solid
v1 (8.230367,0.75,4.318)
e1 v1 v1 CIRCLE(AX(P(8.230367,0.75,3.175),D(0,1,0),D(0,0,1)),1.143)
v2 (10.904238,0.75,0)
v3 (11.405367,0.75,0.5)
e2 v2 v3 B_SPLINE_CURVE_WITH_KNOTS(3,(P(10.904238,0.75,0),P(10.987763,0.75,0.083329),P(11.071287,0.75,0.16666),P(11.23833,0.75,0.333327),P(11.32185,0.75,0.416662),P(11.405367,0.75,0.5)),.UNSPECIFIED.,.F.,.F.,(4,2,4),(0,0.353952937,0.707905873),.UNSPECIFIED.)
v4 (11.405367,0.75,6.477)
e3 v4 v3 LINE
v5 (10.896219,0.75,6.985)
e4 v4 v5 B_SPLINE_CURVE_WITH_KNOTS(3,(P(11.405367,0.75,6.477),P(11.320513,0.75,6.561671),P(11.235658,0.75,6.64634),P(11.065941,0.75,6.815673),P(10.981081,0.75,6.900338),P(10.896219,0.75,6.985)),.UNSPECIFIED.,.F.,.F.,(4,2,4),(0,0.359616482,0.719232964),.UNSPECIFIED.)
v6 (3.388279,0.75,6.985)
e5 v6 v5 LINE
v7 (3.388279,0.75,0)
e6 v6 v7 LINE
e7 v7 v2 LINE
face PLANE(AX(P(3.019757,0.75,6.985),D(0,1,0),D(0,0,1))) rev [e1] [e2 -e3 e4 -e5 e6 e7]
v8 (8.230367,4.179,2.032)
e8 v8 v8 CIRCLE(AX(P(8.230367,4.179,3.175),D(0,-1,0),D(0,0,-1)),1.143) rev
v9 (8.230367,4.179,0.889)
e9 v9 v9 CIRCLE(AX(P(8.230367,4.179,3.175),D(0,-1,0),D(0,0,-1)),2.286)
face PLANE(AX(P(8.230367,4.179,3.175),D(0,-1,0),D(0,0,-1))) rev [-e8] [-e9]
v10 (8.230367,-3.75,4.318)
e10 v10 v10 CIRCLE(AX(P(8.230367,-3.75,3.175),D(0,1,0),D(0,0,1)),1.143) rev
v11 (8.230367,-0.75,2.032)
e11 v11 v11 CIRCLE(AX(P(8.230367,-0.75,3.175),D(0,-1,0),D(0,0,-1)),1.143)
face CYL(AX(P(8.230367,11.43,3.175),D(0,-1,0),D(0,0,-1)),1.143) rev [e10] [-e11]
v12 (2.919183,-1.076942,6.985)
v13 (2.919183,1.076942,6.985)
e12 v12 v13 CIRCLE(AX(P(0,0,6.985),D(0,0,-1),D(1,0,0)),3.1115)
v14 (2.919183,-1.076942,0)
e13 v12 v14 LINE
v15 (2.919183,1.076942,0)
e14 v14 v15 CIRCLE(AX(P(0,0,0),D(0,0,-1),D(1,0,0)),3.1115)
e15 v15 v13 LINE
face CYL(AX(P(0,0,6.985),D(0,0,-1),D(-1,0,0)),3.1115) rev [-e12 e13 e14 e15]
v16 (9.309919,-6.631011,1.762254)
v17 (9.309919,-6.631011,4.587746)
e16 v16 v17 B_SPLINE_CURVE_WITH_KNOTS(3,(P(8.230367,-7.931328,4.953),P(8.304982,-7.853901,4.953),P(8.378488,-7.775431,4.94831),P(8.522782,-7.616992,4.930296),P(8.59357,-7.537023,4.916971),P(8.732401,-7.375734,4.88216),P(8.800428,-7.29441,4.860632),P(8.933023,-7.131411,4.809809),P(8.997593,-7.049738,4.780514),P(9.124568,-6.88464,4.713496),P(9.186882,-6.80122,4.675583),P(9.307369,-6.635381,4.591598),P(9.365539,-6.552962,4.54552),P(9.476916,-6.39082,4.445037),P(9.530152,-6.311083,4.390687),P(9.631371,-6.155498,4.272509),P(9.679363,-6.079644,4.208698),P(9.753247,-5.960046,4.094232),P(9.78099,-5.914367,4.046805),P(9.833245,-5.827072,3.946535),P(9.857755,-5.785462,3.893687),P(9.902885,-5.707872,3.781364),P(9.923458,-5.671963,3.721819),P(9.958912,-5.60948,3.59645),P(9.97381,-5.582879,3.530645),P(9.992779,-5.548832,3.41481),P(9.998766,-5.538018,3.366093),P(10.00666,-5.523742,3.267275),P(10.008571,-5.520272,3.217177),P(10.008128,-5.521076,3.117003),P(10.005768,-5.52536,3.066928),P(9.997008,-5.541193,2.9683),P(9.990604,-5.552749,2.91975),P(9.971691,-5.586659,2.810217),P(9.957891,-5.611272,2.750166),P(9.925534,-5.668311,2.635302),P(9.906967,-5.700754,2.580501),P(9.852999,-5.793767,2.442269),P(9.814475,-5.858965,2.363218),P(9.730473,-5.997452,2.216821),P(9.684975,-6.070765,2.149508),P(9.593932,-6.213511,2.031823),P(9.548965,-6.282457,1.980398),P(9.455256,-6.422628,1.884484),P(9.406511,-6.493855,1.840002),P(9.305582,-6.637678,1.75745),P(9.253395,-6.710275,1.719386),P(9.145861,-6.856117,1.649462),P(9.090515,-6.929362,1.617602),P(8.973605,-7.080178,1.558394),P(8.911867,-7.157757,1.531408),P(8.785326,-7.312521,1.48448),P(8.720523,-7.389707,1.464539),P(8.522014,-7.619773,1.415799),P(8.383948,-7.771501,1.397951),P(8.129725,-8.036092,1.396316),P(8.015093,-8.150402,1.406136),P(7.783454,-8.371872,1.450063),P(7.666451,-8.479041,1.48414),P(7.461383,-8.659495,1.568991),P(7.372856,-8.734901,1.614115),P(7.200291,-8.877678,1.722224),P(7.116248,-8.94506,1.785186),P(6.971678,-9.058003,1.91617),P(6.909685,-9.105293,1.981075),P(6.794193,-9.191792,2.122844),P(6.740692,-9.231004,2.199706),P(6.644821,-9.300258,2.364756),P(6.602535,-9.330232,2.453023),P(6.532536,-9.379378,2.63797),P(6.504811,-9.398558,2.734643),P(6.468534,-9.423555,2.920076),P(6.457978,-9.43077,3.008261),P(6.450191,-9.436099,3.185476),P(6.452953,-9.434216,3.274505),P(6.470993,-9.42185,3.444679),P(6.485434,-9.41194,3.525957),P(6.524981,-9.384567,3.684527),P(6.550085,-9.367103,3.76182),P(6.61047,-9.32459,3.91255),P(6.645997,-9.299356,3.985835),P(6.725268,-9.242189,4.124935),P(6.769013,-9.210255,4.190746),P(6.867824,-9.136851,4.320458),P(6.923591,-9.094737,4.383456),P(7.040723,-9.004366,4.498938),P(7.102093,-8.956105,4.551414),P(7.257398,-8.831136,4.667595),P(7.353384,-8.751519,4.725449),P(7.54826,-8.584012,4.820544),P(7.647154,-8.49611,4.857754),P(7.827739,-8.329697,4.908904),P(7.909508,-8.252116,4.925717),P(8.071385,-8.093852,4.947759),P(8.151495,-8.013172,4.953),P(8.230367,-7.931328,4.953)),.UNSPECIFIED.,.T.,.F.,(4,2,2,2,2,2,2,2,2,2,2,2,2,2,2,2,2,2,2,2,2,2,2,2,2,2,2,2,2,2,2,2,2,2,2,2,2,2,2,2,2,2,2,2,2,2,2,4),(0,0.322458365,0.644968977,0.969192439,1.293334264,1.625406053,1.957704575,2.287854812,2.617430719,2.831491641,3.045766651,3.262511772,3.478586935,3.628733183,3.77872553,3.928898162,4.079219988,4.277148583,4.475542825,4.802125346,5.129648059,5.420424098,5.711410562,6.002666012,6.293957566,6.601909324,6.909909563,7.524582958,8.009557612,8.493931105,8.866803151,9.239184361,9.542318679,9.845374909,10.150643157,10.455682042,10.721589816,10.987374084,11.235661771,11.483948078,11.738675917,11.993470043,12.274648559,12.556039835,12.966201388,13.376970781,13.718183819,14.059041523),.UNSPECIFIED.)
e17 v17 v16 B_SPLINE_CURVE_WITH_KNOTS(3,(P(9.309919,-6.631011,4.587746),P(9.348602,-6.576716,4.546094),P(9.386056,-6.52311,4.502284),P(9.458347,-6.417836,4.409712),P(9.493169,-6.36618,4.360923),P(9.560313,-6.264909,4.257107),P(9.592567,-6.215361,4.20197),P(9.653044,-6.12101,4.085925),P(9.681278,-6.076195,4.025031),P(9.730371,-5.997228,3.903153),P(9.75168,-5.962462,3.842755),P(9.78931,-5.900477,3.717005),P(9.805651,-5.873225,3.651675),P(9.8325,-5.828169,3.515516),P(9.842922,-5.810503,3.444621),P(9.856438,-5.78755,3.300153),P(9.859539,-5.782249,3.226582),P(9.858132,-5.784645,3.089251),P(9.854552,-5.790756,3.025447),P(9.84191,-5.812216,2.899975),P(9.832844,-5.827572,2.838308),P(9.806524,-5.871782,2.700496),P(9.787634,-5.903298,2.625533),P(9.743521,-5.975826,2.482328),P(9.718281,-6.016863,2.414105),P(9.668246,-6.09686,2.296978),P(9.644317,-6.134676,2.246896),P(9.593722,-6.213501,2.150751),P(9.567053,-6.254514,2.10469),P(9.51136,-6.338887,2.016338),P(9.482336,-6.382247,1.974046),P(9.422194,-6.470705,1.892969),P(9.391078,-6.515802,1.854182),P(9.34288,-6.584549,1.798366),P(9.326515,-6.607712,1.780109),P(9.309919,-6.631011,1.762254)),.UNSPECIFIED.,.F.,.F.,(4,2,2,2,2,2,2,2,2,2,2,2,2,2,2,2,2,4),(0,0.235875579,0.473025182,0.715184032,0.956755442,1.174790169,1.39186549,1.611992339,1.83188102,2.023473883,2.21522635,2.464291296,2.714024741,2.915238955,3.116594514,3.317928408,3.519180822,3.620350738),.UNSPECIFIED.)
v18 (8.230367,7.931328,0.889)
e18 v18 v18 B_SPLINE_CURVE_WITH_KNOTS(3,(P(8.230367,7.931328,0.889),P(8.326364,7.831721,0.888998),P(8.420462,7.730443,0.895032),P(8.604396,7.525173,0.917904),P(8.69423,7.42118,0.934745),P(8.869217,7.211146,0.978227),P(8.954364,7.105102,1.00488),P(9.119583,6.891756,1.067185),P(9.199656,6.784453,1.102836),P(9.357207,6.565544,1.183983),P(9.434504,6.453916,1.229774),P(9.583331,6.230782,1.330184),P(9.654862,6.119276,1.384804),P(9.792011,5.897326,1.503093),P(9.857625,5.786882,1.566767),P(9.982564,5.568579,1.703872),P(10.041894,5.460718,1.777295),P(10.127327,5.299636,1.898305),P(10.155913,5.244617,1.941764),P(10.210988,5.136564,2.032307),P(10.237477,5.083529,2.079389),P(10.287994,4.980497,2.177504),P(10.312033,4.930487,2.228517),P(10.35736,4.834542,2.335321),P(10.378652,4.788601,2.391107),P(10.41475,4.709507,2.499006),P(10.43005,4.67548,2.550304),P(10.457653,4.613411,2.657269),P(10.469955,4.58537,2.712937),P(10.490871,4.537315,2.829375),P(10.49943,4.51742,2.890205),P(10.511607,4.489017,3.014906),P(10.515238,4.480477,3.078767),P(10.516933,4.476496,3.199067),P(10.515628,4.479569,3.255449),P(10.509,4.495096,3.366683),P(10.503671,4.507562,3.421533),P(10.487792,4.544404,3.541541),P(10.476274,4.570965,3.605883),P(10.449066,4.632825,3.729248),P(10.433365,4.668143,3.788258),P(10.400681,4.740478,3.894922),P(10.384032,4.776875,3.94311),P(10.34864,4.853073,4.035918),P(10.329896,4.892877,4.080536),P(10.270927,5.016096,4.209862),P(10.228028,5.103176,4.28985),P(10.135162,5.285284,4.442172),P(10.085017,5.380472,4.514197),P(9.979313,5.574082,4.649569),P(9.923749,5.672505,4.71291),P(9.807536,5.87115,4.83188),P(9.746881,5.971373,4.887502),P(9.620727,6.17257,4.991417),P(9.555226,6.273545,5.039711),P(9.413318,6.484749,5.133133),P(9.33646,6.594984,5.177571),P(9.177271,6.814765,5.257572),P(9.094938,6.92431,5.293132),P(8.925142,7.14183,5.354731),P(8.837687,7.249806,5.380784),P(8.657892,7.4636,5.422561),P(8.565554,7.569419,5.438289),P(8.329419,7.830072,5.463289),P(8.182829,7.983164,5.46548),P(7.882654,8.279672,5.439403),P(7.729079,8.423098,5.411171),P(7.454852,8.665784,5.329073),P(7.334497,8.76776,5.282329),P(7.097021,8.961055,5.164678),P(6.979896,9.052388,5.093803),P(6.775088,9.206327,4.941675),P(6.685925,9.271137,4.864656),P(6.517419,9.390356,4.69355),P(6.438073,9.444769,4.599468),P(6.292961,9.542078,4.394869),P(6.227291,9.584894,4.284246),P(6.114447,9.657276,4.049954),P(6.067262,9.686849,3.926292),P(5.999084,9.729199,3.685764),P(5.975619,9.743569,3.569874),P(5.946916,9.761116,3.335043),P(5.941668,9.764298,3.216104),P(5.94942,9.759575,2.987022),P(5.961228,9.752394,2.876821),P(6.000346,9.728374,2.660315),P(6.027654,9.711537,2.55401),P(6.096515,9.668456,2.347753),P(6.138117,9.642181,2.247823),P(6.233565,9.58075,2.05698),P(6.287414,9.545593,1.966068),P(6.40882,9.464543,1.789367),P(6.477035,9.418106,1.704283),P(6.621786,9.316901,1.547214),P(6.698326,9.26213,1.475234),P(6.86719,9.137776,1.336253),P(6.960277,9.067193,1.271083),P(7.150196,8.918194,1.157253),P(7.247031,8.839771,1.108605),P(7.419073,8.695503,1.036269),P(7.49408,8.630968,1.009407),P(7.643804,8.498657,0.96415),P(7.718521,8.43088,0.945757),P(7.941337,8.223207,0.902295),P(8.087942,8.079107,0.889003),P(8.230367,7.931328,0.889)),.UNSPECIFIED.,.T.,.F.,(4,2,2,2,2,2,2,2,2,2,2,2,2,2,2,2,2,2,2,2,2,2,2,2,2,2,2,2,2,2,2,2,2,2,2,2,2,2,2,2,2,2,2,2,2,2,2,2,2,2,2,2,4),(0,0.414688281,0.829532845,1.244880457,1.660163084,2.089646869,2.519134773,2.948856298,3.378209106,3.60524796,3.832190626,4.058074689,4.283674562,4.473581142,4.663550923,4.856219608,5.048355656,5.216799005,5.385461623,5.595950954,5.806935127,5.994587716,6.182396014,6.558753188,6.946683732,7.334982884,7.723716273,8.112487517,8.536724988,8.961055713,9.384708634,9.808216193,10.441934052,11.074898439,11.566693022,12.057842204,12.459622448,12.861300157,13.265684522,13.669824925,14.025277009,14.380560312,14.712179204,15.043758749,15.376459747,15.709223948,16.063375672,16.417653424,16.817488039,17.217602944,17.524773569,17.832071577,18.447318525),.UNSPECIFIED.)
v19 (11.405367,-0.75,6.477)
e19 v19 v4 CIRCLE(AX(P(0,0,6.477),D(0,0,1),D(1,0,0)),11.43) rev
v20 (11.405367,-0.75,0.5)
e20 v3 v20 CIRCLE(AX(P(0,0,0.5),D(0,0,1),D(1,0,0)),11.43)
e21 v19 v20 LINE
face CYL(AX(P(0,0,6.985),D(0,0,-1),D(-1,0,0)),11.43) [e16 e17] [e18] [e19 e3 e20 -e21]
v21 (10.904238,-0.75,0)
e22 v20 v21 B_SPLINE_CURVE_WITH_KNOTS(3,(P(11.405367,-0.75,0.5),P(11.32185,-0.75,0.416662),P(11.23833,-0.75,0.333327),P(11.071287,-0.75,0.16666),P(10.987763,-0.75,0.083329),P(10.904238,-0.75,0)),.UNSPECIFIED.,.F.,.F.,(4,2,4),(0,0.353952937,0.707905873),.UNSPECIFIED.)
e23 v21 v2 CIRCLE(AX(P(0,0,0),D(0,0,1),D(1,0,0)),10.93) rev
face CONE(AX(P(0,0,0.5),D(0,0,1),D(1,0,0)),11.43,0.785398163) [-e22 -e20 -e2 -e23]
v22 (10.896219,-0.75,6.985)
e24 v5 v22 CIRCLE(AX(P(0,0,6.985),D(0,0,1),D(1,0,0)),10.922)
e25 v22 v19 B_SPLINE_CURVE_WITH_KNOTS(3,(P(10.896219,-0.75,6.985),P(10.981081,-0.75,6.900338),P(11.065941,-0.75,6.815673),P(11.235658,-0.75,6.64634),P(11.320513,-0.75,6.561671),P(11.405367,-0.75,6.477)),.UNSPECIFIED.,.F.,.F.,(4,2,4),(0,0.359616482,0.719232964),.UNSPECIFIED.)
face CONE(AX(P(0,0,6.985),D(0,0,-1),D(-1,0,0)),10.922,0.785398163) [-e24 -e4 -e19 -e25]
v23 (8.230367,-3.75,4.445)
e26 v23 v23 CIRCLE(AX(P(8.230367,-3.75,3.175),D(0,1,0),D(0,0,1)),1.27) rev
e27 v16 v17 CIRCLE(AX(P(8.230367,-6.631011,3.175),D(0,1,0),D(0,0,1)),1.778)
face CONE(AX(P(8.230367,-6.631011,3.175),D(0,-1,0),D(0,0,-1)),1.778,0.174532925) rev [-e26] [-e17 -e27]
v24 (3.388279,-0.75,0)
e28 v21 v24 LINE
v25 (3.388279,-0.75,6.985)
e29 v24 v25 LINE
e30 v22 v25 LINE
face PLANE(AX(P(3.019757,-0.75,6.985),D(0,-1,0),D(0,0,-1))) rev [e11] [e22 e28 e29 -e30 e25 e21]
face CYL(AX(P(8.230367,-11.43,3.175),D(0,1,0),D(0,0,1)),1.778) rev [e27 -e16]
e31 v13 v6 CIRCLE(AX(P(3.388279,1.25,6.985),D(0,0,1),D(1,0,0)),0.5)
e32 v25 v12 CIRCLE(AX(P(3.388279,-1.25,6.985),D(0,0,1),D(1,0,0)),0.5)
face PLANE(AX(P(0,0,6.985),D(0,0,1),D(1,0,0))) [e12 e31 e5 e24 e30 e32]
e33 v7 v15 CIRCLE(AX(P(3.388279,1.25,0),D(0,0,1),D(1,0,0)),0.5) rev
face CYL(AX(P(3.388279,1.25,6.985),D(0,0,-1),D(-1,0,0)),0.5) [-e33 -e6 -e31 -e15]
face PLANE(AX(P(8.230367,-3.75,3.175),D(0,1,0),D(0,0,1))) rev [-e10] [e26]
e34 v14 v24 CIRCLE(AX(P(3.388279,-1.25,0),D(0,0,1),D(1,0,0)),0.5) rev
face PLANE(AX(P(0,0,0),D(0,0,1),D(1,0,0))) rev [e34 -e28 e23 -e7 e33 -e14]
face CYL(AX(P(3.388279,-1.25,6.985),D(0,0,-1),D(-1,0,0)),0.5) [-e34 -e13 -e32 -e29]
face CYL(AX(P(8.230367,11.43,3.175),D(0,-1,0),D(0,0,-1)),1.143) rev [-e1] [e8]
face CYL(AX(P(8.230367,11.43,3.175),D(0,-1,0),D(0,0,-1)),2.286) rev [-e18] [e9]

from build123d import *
from build123d.topology import SkipClean

# Parameters (mm, degrees)
BOSS_EXTRUDE1_DEPTH     = 6.985
CUT_EXTRUDE1_DEPTH      = 19.104903341
CUT_EXTRUDE1_DEPTH_BACK = 19.104903341
SKETCH2_R               = 1.143
SKETCH3_R               = 2.286
CUT_EXTRUDE2_DEPTH      = 21.568811653
BOSS_EXTRUDE2_START     = 1.27
BOSS_EXTRUDE2_DEPTH     = 1.27
BOSS_EXTRUDE3_START     = 2.54
SKETCH5_R               = 11.43
SKETCH5_R_2             = 3.1115
BOSS_EXTRUDE3_DEPTH     = 2.54
SKETCH29_R              = 1.778
CUT_EXTRUDE9_DEPTH      = 21.245185396
CHAMFER3_SIZE           = 2.881011164
CHAMFER3_SIZE_2         = 0.508
CHAMFER4_SIZE           = 0.508
FILLET1_R               = 0.5
SKETCH30_R              = 16.901185141
CUT_EXTRUDE10_DEPTH     = 3.81
CHAMFER5_SIZE           = 0.5


with BuildPart() as part:
    # Sketch1 → Boss-Extrude1 (new body)
    with BuildSketch(Plane.XY):
        with BuildLine():
            Line((3.019756985, -0.75), (11.405367158, -0.75))
            ThreePointArc((11.405367158, -0.75), (-11.43, 0), (11.405367158, 0.75))
            Line((11.405367158, 0.75), (3.019756985, 0.75))
            ThreePointArc((3.019756985, 0.75), (-3.1115, 0), (3.019756985, -0.75))
        make_face()
    extrude(amount=BOSS_EXTRUDE1_DEPTH)

    # Sketch2 → Cut-Extrude1 (cut, two sides: drawn at the far end of the back side and taken through both)
    with BuildSketch(Plane.XZ.offset(-0.75).offset(-CUT_EXTRUDE1_DEPTH_BACK)):
        with Locations(Location((8.230367158, 3.175, 0), (0, 0, 270))):
            Circle(SKETCH2_R)
    extrude(amount=CUT_EXTRUDE1_DEPTH + CUT_EXTRUDE1_DEPTH_BACK, mode=Mode.SUBTRACT)

    # Sketch3 → Cut-Extrude2 (cut, through all)
    with BuildSketch(Plane(origin=(0, 4.179, 0), x_dir=(-1, 0, 0), z_dir=(0, -1, 0))):
        with Locations(Location((-8.230367158, -3.175, 0), (0, 0, 90))):
            Circle(SKETCH3_R)
    extrude(amount=-CUT_EXTRUDE2_DEPTH, mode=Mode.SUBTRACT)

    # Sketch4 → Boss-Extrude2 (add)
    with BuildSketch(Plane(origin=(0, 0, 0), x_dir=(-1, 0, 0), z_dir=(0, 0, -1)).offset(BOSS_EXTRUDE2_START)):
        with BuildLine():
            Line((3.1115, 0), (11.43, 0))
            ThreePointArc((11.43, 0), (0.375202204, 11.42384013), (-11.405367158, 0.75))
            Line((-11.405367158, 0.75), (-3.019756985, 0.75))
            ThreePointArc((-3.019756985, 0.75), (0.377795176, 3.088479084), (3.1115, 0))
        make_face()
    extrude(amount=-BOSS_EXTRUDE2_DEPTH)

    # Sketch5 → Boss-Extrude3 (add)
    with SkipClean():  # the faces are left unmerged after this step: merging them gives an invalid solid
        with BuildSketch(Plane(origin=(0, 0, -1.27), x_dir=(-1, 0, 0), z_dir=(0, 0, -1)).offset(BOSS_EXTRUDE3_START)):
            Circle(SKETCH5_R)
            Circle(SKETCH5_R_2, mode=Mode.SUBTRACT)
        extrude(amount=-BOSS_EXTRUDE3_DEPTH)

    # Sketch29 → Cut-Extrude9 (cut, through all)
    with SkipClean():  # the faces are left unmerged after this step: merging them gives an invalid solid
        with BuildSketch(Plane(origin=(0, -3.75, 0), x_dir=(1, 0, 0), z_dir=(0, 1, 0))):
            with Locations(Location((8.230367158, -3.175, 0), (0, 0, 270))):
                Circle(SKETCH29_R)
        extrude(amount=-CUT_EXTRUDE9_DEPTH, mode=Mode.SUBTRACT)

    # Chamfer3
    # the kernel refuses this chamfer: 2.881011164, 0.508 mm, written as the material it adds along each edge
    with BuildSketch(Plane(origin=(8.230367158, -3.75, 3.175), x_dir=(0, 0, 1), z_dir=(-1, 0, 0))) as chamfer3_piece_1_section:
        Polygon((1.778, -CHAMFER3_SIZE), (1.778 - CHAMFER3_SIZE_2, 0), (1.778, 0), align=None)
    chamfer3_piece_1 = revolve(axis=Axis((8.230367158, -3.75, 3.175), (0, 1, 0)), mode=Mode.PRIVATE)
    chamfer3_piece_1 = chamfer3_piece_1 & Plane(origin=(0, 0, 1.63014176), x_dir=(0.9978448956793416, -0.06561679790026252, 0), z_dir=(0, 0, -1)) * Cylinder(11.43, 12, mode=Mode.PRIVATE)
    add(chamfer3_piece_1)

    # Chamfer4
    chamfer4_edges = [part.edges().sort_by_distance(p)[0] for p in [
        (-11.43, 0, 6.985),
    ]]
    chamfer(chamfer4_edges, length=CHAMFER4_SIZE)

    # Fillet1
    # the kernel refuses this fillet: 0.5 mm, written as the material it takes off along each edge
    with BuildSketch(Plane(origin=(-3.1115, 0, -1.27), x_dir=(-1, 0, 0), z_dir=(0, 0, 1))) as fillet1_piece_1:
        with BuildLine():
            CenterArc((0.46522088, -0.5), FILLET1_R, 90, 82.042030685)
            ThreePointArc((-0.029964068, -0.430776686), (-0.007500056, -0.215908776), (0, 0))
            Line((0, 0), (0.46522088, 0))
        make_face()
    extrude(amount=1.27, mode=Mode.SUBTRACT)
    with BuildSketch(Plane(origin=(-11.43, 0, -1.27), x_dir=(0.022878815711235678, 0.9997382456381528, 0), z_dir=(0, 0, 1))) as fillet1_piece_2:
        with BuildLine():
            CenterArc((0.511570319, -0.499869123), FILLET1_R, 88.689026033, 92.621947934)
            Line((0.011701196, -0.511308531), (0, 0))
            ThreePointArc((0, 0), (0.261504864, 0.002991852), (0.523009727, 0))
        make_face()
    extrude(amount=1.27, mode=Mode.SUBTRACT)
    with BuildSketch(Plane(origin=(3.019756985, -0.75, -0.921304177), x_dir=(1, 0, 0), z_dir=(0, 0, 1))) as fillet1_piece_3:
        with BuildLine():
            CenterArc((0.368521671, -0.5), FILLET1_R, 90, 69.75002962)
            ThreePointArc((-0.100574087, -0.326941714), (-0.04579087, -0.164853974), (0, 0))
            Line((0, 0), (0.368521671, 0))
        make_face()
    extrude(amount=8.827608353, mode=Mode.SUBTRACT)
    with BuildSketch(Plane(origin=(3.019756985, 0.75, 7.906304177), x_dir=(1, 0, 0), z_dir=(0, 0, -1))) as fillet1_piece_4:
        with BuildLine():
            CenterArc((0.368521671, -0.5), FILLET1_R, 90, 69.75002962)
            ThreePointArc((-0.100574087, -0.326941714), (-0.04579087, -0.164853974), (0, 0))
            Line((0, 0), (0.368521671, 0))
        make_face()
    extrude(amount=9.176304177, mode=Mode.SUBTRACT)

    # Sketch30 → Cut-Extrude10 (cut)
    with BuildSketch(Plane(origin=(0, 0, -3.81), x_dir=(-1, 0, 0), z_dir=(0, 0, -1))):
        Circle(SKETCH30_R)
    extrude(amount=-CUT_EXTRUDE10_DEPTH, mode=Mode.SUBTRACT)

    # Chamfer5
    chamfer5_edges = [part.edges().sort_by_distance(p)[0] for p in [
        (-11.43, 0, 0),
    ]]
    chamfer(chamfer5_edges, length=CHAMFER5_SIZE)


solid = part.part
